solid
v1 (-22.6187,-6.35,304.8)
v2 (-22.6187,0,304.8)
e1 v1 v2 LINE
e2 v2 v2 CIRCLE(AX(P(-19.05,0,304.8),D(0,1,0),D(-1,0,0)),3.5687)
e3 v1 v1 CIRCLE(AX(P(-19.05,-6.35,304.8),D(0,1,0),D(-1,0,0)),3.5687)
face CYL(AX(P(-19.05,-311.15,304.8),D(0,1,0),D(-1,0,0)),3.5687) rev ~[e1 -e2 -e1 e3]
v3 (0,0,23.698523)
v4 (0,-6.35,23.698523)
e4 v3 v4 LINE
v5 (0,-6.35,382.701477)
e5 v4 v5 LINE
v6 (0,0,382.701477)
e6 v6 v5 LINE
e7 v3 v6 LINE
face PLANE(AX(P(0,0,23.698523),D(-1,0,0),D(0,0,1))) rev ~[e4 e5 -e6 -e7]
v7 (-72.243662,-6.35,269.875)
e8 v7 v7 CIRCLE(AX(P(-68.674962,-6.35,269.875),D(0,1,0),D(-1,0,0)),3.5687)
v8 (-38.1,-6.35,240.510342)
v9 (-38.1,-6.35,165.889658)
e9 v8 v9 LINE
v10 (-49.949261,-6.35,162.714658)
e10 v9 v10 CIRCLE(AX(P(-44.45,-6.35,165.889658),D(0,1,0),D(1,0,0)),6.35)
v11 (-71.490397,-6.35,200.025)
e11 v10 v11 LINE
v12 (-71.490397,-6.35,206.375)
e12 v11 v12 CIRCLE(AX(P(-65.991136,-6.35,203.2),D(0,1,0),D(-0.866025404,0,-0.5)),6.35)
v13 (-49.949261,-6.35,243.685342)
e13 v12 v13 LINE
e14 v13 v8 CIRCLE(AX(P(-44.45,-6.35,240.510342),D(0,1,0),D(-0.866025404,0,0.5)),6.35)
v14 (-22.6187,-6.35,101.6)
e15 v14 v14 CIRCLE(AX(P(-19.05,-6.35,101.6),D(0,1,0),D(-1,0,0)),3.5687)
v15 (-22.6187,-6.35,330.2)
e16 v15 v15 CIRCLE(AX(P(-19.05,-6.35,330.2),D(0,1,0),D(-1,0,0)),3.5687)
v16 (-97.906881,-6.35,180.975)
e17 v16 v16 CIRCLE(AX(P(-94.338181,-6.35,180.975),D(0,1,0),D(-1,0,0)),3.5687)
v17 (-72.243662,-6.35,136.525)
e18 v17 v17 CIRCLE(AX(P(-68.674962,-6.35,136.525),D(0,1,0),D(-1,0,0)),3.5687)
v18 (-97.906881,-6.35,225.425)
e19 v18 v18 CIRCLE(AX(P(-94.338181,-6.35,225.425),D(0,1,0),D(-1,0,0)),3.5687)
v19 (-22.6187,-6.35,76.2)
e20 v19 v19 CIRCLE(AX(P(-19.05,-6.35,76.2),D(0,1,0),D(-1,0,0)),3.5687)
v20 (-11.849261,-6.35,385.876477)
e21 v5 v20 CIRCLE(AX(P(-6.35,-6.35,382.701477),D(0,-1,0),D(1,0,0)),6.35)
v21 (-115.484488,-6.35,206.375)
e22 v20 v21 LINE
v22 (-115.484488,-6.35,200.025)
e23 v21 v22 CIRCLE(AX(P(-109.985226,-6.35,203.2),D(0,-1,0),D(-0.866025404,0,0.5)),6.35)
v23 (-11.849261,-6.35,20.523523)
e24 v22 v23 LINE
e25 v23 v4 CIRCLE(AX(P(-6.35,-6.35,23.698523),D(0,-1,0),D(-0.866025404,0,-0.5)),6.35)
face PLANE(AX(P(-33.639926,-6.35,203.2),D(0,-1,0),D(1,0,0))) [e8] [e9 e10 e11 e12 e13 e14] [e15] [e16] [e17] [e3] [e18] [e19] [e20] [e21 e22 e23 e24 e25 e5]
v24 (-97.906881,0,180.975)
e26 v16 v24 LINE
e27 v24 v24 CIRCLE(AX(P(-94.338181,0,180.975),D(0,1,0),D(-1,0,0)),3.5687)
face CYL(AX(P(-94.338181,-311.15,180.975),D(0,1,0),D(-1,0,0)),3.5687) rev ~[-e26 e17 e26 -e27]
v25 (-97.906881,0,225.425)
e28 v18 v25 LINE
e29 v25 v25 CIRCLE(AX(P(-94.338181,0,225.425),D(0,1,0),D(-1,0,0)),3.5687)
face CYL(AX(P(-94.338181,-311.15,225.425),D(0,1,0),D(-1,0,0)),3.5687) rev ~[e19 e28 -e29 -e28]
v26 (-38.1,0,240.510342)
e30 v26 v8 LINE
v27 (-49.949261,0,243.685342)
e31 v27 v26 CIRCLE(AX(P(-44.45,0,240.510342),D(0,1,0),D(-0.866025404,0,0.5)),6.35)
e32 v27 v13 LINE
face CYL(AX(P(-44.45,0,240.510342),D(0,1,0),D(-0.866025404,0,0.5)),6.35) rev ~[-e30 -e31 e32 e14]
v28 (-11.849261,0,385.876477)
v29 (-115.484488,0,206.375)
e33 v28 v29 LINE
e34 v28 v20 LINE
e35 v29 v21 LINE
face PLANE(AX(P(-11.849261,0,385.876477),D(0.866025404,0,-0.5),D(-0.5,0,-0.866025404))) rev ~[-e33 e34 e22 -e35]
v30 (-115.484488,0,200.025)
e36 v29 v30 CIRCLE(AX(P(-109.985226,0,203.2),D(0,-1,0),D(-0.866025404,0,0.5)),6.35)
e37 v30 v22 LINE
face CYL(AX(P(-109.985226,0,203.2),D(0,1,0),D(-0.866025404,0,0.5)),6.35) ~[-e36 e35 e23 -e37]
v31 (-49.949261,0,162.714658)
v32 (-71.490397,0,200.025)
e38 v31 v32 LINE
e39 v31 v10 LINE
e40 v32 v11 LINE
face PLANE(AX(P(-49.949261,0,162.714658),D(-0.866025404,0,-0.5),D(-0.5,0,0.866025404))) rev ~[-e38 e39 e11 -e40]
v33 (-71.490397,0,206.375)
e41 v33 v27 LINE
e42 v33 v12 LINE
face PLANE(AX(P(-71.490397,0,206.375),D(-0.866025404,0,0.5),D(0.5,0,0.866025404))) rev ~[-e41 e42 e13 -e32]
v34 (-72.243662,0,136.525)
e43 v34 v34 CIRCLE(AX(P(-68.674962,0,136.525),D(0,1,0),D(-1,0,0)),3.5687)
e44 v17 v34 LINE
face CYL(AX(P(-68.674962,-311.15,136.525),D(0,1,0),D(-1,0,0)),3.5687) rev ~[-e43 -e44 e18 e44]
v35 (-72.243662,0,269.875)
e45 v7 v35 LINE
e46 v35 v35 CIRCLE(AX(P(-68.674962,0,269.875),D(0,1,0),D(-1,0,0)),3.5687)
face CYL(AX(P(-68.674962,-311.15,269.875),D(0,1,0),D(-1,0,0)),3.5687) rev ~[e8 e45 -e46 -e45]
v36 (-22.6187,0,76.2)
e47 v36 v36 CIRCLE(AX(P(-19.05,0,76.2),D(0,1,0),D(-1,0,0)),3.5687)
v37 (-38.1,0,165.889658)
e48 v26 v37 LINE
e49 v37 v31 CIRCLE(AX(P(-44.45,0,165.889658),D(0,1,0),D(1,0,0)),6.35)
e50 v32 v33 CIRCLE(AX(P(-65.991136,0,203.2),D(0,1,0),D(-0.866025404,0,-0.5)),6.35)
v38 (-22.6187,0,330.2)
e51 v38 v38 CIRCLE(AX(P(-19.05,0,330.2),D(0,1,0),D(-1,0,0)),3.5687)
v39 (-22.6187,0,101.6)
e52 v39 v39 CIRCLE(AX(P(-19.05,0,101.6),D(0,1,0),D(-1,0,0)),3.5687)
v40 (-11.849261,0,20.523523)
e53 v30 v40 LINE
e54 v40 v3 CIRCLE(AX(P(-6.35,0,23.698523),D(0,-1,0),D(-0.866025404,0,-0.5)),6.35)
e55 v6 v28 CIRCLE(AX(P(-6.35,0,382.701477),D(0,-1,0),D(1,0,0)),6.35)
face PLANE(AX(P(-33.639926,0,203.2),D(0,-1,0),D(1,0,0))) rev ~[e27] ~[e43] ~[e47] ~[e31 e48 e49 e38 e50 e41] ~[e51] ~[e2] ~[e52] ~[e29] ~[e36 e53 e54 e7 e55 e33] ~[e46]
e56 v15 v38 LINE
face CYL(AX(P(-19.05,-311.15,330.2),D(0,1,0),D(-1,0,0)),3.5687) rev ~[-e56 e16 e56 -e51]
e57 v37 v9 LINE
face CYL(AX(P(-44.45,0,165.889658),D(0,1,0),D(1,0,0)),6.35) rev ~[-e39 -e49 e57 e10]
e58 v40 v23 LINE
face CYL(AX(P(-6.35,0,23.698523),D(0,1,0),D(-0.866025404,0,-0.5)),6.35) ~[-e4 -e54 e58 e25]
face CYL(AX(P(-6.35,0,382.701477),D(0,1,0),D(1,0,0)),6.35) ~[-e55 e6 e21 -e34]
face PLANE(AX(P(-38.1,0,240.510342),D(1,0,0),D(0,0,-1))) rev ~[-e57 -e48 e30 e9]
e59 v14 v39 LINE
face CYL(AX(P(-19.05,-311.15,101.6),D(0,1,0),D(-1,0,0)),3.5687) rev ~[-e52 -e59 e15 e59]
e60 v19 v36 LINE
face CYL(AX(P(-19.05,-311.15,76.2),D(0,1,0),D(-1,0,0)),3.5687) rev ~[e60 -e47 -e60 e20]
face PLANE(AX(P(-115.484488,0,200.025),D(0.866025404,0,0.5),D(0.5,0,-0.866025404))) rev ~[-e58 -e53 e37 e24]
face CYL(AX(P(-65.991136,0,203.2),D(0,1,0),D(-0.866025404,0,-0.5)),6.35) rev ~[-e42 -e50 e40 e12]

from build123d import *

# Parameters (mm, degrees)
F1_DEPTH = 6.35
F3_D     = 7.1374
F3_DEPTH = 304.8
F3_TIP   = 2.1442912911


# Not quite as in the source:
# - a feature names something its author has since deleted; it is built from what else it names


with BuildPart() as f1:
    # F0 (on Front) → F1 (new body)
    with BuildSketch(Plane.XZ):
        with BuildLine():
            ThreePointArc((-11.849261314, 20.5235226281), (-4.7064990636, 17.5648936311), (0, 23.6985226281))
            Line((0, 23.6985226281), (0, 382.7014773719))
            ThreePointArc((0, 382.7014773719), (-4.7064990636, 388.8351063689), (-11.849261314, 385.8764773719))
            Line((-11.849261314, 385.8764773719), (-115.4844875947, 206.375))
            ThreePointArc((-115.4844875947, 206.375), (-116.3352262806, 203.2), (-115.4844875947, 200.025))
            Line((-115.4844875947, 200.025), (-11.849261314, 20.5235226281))
        make_face()
        with BuildLine():
            ThreePointArc((-49.949261314, 243.6853416036), (-42.8064990636, 246.6439706005), (-38.1, 240.5103416036))
            Line((-38.1, 240.5103416036), (-38.1, 165.8896583964))
            ThreePointArc((-38.1, 165.8896583964), (-42.8064990636, 159.7560293995), (-49.949261314, 162.7146583964))
            Line((-49.949261314, 162.7146583964), (-71.4903970824, 200.025))
            ThreePointArc((-71.4903970824, 200.025), (-72.3411357684, 203.2), (-71.4903970824, 206.375))
            Line((-71.4903970824, 206.375), (-49.949261314, 243.6853416036))
        make_face(mode=Mode.SUBTRACT)
    extrude(amount=F1_DEPTH)

    # F3
    with Locations(Plane.XZ.offset(6.35)):
        with Locations((-94.3381810245, 225.425), (-94.3381810245, 180.975), (-19.05, 304.8), (-19.05, 101.6), (-19.05, 76.2), (-19.05, 330.2), (-68.674961559, 269.875), (-68.674961559, 136.525)):
            Hole(F3_D / 2, depth=F3_DEPTH)
            with Locations((0, 0, -(F3_DEPTH + F3_TIP / 2))):  # 118° drill point
                Cone(0, F3_D / 2, F3_TIP, mode=Mode.SUBTRACT)


solid = f1.part
